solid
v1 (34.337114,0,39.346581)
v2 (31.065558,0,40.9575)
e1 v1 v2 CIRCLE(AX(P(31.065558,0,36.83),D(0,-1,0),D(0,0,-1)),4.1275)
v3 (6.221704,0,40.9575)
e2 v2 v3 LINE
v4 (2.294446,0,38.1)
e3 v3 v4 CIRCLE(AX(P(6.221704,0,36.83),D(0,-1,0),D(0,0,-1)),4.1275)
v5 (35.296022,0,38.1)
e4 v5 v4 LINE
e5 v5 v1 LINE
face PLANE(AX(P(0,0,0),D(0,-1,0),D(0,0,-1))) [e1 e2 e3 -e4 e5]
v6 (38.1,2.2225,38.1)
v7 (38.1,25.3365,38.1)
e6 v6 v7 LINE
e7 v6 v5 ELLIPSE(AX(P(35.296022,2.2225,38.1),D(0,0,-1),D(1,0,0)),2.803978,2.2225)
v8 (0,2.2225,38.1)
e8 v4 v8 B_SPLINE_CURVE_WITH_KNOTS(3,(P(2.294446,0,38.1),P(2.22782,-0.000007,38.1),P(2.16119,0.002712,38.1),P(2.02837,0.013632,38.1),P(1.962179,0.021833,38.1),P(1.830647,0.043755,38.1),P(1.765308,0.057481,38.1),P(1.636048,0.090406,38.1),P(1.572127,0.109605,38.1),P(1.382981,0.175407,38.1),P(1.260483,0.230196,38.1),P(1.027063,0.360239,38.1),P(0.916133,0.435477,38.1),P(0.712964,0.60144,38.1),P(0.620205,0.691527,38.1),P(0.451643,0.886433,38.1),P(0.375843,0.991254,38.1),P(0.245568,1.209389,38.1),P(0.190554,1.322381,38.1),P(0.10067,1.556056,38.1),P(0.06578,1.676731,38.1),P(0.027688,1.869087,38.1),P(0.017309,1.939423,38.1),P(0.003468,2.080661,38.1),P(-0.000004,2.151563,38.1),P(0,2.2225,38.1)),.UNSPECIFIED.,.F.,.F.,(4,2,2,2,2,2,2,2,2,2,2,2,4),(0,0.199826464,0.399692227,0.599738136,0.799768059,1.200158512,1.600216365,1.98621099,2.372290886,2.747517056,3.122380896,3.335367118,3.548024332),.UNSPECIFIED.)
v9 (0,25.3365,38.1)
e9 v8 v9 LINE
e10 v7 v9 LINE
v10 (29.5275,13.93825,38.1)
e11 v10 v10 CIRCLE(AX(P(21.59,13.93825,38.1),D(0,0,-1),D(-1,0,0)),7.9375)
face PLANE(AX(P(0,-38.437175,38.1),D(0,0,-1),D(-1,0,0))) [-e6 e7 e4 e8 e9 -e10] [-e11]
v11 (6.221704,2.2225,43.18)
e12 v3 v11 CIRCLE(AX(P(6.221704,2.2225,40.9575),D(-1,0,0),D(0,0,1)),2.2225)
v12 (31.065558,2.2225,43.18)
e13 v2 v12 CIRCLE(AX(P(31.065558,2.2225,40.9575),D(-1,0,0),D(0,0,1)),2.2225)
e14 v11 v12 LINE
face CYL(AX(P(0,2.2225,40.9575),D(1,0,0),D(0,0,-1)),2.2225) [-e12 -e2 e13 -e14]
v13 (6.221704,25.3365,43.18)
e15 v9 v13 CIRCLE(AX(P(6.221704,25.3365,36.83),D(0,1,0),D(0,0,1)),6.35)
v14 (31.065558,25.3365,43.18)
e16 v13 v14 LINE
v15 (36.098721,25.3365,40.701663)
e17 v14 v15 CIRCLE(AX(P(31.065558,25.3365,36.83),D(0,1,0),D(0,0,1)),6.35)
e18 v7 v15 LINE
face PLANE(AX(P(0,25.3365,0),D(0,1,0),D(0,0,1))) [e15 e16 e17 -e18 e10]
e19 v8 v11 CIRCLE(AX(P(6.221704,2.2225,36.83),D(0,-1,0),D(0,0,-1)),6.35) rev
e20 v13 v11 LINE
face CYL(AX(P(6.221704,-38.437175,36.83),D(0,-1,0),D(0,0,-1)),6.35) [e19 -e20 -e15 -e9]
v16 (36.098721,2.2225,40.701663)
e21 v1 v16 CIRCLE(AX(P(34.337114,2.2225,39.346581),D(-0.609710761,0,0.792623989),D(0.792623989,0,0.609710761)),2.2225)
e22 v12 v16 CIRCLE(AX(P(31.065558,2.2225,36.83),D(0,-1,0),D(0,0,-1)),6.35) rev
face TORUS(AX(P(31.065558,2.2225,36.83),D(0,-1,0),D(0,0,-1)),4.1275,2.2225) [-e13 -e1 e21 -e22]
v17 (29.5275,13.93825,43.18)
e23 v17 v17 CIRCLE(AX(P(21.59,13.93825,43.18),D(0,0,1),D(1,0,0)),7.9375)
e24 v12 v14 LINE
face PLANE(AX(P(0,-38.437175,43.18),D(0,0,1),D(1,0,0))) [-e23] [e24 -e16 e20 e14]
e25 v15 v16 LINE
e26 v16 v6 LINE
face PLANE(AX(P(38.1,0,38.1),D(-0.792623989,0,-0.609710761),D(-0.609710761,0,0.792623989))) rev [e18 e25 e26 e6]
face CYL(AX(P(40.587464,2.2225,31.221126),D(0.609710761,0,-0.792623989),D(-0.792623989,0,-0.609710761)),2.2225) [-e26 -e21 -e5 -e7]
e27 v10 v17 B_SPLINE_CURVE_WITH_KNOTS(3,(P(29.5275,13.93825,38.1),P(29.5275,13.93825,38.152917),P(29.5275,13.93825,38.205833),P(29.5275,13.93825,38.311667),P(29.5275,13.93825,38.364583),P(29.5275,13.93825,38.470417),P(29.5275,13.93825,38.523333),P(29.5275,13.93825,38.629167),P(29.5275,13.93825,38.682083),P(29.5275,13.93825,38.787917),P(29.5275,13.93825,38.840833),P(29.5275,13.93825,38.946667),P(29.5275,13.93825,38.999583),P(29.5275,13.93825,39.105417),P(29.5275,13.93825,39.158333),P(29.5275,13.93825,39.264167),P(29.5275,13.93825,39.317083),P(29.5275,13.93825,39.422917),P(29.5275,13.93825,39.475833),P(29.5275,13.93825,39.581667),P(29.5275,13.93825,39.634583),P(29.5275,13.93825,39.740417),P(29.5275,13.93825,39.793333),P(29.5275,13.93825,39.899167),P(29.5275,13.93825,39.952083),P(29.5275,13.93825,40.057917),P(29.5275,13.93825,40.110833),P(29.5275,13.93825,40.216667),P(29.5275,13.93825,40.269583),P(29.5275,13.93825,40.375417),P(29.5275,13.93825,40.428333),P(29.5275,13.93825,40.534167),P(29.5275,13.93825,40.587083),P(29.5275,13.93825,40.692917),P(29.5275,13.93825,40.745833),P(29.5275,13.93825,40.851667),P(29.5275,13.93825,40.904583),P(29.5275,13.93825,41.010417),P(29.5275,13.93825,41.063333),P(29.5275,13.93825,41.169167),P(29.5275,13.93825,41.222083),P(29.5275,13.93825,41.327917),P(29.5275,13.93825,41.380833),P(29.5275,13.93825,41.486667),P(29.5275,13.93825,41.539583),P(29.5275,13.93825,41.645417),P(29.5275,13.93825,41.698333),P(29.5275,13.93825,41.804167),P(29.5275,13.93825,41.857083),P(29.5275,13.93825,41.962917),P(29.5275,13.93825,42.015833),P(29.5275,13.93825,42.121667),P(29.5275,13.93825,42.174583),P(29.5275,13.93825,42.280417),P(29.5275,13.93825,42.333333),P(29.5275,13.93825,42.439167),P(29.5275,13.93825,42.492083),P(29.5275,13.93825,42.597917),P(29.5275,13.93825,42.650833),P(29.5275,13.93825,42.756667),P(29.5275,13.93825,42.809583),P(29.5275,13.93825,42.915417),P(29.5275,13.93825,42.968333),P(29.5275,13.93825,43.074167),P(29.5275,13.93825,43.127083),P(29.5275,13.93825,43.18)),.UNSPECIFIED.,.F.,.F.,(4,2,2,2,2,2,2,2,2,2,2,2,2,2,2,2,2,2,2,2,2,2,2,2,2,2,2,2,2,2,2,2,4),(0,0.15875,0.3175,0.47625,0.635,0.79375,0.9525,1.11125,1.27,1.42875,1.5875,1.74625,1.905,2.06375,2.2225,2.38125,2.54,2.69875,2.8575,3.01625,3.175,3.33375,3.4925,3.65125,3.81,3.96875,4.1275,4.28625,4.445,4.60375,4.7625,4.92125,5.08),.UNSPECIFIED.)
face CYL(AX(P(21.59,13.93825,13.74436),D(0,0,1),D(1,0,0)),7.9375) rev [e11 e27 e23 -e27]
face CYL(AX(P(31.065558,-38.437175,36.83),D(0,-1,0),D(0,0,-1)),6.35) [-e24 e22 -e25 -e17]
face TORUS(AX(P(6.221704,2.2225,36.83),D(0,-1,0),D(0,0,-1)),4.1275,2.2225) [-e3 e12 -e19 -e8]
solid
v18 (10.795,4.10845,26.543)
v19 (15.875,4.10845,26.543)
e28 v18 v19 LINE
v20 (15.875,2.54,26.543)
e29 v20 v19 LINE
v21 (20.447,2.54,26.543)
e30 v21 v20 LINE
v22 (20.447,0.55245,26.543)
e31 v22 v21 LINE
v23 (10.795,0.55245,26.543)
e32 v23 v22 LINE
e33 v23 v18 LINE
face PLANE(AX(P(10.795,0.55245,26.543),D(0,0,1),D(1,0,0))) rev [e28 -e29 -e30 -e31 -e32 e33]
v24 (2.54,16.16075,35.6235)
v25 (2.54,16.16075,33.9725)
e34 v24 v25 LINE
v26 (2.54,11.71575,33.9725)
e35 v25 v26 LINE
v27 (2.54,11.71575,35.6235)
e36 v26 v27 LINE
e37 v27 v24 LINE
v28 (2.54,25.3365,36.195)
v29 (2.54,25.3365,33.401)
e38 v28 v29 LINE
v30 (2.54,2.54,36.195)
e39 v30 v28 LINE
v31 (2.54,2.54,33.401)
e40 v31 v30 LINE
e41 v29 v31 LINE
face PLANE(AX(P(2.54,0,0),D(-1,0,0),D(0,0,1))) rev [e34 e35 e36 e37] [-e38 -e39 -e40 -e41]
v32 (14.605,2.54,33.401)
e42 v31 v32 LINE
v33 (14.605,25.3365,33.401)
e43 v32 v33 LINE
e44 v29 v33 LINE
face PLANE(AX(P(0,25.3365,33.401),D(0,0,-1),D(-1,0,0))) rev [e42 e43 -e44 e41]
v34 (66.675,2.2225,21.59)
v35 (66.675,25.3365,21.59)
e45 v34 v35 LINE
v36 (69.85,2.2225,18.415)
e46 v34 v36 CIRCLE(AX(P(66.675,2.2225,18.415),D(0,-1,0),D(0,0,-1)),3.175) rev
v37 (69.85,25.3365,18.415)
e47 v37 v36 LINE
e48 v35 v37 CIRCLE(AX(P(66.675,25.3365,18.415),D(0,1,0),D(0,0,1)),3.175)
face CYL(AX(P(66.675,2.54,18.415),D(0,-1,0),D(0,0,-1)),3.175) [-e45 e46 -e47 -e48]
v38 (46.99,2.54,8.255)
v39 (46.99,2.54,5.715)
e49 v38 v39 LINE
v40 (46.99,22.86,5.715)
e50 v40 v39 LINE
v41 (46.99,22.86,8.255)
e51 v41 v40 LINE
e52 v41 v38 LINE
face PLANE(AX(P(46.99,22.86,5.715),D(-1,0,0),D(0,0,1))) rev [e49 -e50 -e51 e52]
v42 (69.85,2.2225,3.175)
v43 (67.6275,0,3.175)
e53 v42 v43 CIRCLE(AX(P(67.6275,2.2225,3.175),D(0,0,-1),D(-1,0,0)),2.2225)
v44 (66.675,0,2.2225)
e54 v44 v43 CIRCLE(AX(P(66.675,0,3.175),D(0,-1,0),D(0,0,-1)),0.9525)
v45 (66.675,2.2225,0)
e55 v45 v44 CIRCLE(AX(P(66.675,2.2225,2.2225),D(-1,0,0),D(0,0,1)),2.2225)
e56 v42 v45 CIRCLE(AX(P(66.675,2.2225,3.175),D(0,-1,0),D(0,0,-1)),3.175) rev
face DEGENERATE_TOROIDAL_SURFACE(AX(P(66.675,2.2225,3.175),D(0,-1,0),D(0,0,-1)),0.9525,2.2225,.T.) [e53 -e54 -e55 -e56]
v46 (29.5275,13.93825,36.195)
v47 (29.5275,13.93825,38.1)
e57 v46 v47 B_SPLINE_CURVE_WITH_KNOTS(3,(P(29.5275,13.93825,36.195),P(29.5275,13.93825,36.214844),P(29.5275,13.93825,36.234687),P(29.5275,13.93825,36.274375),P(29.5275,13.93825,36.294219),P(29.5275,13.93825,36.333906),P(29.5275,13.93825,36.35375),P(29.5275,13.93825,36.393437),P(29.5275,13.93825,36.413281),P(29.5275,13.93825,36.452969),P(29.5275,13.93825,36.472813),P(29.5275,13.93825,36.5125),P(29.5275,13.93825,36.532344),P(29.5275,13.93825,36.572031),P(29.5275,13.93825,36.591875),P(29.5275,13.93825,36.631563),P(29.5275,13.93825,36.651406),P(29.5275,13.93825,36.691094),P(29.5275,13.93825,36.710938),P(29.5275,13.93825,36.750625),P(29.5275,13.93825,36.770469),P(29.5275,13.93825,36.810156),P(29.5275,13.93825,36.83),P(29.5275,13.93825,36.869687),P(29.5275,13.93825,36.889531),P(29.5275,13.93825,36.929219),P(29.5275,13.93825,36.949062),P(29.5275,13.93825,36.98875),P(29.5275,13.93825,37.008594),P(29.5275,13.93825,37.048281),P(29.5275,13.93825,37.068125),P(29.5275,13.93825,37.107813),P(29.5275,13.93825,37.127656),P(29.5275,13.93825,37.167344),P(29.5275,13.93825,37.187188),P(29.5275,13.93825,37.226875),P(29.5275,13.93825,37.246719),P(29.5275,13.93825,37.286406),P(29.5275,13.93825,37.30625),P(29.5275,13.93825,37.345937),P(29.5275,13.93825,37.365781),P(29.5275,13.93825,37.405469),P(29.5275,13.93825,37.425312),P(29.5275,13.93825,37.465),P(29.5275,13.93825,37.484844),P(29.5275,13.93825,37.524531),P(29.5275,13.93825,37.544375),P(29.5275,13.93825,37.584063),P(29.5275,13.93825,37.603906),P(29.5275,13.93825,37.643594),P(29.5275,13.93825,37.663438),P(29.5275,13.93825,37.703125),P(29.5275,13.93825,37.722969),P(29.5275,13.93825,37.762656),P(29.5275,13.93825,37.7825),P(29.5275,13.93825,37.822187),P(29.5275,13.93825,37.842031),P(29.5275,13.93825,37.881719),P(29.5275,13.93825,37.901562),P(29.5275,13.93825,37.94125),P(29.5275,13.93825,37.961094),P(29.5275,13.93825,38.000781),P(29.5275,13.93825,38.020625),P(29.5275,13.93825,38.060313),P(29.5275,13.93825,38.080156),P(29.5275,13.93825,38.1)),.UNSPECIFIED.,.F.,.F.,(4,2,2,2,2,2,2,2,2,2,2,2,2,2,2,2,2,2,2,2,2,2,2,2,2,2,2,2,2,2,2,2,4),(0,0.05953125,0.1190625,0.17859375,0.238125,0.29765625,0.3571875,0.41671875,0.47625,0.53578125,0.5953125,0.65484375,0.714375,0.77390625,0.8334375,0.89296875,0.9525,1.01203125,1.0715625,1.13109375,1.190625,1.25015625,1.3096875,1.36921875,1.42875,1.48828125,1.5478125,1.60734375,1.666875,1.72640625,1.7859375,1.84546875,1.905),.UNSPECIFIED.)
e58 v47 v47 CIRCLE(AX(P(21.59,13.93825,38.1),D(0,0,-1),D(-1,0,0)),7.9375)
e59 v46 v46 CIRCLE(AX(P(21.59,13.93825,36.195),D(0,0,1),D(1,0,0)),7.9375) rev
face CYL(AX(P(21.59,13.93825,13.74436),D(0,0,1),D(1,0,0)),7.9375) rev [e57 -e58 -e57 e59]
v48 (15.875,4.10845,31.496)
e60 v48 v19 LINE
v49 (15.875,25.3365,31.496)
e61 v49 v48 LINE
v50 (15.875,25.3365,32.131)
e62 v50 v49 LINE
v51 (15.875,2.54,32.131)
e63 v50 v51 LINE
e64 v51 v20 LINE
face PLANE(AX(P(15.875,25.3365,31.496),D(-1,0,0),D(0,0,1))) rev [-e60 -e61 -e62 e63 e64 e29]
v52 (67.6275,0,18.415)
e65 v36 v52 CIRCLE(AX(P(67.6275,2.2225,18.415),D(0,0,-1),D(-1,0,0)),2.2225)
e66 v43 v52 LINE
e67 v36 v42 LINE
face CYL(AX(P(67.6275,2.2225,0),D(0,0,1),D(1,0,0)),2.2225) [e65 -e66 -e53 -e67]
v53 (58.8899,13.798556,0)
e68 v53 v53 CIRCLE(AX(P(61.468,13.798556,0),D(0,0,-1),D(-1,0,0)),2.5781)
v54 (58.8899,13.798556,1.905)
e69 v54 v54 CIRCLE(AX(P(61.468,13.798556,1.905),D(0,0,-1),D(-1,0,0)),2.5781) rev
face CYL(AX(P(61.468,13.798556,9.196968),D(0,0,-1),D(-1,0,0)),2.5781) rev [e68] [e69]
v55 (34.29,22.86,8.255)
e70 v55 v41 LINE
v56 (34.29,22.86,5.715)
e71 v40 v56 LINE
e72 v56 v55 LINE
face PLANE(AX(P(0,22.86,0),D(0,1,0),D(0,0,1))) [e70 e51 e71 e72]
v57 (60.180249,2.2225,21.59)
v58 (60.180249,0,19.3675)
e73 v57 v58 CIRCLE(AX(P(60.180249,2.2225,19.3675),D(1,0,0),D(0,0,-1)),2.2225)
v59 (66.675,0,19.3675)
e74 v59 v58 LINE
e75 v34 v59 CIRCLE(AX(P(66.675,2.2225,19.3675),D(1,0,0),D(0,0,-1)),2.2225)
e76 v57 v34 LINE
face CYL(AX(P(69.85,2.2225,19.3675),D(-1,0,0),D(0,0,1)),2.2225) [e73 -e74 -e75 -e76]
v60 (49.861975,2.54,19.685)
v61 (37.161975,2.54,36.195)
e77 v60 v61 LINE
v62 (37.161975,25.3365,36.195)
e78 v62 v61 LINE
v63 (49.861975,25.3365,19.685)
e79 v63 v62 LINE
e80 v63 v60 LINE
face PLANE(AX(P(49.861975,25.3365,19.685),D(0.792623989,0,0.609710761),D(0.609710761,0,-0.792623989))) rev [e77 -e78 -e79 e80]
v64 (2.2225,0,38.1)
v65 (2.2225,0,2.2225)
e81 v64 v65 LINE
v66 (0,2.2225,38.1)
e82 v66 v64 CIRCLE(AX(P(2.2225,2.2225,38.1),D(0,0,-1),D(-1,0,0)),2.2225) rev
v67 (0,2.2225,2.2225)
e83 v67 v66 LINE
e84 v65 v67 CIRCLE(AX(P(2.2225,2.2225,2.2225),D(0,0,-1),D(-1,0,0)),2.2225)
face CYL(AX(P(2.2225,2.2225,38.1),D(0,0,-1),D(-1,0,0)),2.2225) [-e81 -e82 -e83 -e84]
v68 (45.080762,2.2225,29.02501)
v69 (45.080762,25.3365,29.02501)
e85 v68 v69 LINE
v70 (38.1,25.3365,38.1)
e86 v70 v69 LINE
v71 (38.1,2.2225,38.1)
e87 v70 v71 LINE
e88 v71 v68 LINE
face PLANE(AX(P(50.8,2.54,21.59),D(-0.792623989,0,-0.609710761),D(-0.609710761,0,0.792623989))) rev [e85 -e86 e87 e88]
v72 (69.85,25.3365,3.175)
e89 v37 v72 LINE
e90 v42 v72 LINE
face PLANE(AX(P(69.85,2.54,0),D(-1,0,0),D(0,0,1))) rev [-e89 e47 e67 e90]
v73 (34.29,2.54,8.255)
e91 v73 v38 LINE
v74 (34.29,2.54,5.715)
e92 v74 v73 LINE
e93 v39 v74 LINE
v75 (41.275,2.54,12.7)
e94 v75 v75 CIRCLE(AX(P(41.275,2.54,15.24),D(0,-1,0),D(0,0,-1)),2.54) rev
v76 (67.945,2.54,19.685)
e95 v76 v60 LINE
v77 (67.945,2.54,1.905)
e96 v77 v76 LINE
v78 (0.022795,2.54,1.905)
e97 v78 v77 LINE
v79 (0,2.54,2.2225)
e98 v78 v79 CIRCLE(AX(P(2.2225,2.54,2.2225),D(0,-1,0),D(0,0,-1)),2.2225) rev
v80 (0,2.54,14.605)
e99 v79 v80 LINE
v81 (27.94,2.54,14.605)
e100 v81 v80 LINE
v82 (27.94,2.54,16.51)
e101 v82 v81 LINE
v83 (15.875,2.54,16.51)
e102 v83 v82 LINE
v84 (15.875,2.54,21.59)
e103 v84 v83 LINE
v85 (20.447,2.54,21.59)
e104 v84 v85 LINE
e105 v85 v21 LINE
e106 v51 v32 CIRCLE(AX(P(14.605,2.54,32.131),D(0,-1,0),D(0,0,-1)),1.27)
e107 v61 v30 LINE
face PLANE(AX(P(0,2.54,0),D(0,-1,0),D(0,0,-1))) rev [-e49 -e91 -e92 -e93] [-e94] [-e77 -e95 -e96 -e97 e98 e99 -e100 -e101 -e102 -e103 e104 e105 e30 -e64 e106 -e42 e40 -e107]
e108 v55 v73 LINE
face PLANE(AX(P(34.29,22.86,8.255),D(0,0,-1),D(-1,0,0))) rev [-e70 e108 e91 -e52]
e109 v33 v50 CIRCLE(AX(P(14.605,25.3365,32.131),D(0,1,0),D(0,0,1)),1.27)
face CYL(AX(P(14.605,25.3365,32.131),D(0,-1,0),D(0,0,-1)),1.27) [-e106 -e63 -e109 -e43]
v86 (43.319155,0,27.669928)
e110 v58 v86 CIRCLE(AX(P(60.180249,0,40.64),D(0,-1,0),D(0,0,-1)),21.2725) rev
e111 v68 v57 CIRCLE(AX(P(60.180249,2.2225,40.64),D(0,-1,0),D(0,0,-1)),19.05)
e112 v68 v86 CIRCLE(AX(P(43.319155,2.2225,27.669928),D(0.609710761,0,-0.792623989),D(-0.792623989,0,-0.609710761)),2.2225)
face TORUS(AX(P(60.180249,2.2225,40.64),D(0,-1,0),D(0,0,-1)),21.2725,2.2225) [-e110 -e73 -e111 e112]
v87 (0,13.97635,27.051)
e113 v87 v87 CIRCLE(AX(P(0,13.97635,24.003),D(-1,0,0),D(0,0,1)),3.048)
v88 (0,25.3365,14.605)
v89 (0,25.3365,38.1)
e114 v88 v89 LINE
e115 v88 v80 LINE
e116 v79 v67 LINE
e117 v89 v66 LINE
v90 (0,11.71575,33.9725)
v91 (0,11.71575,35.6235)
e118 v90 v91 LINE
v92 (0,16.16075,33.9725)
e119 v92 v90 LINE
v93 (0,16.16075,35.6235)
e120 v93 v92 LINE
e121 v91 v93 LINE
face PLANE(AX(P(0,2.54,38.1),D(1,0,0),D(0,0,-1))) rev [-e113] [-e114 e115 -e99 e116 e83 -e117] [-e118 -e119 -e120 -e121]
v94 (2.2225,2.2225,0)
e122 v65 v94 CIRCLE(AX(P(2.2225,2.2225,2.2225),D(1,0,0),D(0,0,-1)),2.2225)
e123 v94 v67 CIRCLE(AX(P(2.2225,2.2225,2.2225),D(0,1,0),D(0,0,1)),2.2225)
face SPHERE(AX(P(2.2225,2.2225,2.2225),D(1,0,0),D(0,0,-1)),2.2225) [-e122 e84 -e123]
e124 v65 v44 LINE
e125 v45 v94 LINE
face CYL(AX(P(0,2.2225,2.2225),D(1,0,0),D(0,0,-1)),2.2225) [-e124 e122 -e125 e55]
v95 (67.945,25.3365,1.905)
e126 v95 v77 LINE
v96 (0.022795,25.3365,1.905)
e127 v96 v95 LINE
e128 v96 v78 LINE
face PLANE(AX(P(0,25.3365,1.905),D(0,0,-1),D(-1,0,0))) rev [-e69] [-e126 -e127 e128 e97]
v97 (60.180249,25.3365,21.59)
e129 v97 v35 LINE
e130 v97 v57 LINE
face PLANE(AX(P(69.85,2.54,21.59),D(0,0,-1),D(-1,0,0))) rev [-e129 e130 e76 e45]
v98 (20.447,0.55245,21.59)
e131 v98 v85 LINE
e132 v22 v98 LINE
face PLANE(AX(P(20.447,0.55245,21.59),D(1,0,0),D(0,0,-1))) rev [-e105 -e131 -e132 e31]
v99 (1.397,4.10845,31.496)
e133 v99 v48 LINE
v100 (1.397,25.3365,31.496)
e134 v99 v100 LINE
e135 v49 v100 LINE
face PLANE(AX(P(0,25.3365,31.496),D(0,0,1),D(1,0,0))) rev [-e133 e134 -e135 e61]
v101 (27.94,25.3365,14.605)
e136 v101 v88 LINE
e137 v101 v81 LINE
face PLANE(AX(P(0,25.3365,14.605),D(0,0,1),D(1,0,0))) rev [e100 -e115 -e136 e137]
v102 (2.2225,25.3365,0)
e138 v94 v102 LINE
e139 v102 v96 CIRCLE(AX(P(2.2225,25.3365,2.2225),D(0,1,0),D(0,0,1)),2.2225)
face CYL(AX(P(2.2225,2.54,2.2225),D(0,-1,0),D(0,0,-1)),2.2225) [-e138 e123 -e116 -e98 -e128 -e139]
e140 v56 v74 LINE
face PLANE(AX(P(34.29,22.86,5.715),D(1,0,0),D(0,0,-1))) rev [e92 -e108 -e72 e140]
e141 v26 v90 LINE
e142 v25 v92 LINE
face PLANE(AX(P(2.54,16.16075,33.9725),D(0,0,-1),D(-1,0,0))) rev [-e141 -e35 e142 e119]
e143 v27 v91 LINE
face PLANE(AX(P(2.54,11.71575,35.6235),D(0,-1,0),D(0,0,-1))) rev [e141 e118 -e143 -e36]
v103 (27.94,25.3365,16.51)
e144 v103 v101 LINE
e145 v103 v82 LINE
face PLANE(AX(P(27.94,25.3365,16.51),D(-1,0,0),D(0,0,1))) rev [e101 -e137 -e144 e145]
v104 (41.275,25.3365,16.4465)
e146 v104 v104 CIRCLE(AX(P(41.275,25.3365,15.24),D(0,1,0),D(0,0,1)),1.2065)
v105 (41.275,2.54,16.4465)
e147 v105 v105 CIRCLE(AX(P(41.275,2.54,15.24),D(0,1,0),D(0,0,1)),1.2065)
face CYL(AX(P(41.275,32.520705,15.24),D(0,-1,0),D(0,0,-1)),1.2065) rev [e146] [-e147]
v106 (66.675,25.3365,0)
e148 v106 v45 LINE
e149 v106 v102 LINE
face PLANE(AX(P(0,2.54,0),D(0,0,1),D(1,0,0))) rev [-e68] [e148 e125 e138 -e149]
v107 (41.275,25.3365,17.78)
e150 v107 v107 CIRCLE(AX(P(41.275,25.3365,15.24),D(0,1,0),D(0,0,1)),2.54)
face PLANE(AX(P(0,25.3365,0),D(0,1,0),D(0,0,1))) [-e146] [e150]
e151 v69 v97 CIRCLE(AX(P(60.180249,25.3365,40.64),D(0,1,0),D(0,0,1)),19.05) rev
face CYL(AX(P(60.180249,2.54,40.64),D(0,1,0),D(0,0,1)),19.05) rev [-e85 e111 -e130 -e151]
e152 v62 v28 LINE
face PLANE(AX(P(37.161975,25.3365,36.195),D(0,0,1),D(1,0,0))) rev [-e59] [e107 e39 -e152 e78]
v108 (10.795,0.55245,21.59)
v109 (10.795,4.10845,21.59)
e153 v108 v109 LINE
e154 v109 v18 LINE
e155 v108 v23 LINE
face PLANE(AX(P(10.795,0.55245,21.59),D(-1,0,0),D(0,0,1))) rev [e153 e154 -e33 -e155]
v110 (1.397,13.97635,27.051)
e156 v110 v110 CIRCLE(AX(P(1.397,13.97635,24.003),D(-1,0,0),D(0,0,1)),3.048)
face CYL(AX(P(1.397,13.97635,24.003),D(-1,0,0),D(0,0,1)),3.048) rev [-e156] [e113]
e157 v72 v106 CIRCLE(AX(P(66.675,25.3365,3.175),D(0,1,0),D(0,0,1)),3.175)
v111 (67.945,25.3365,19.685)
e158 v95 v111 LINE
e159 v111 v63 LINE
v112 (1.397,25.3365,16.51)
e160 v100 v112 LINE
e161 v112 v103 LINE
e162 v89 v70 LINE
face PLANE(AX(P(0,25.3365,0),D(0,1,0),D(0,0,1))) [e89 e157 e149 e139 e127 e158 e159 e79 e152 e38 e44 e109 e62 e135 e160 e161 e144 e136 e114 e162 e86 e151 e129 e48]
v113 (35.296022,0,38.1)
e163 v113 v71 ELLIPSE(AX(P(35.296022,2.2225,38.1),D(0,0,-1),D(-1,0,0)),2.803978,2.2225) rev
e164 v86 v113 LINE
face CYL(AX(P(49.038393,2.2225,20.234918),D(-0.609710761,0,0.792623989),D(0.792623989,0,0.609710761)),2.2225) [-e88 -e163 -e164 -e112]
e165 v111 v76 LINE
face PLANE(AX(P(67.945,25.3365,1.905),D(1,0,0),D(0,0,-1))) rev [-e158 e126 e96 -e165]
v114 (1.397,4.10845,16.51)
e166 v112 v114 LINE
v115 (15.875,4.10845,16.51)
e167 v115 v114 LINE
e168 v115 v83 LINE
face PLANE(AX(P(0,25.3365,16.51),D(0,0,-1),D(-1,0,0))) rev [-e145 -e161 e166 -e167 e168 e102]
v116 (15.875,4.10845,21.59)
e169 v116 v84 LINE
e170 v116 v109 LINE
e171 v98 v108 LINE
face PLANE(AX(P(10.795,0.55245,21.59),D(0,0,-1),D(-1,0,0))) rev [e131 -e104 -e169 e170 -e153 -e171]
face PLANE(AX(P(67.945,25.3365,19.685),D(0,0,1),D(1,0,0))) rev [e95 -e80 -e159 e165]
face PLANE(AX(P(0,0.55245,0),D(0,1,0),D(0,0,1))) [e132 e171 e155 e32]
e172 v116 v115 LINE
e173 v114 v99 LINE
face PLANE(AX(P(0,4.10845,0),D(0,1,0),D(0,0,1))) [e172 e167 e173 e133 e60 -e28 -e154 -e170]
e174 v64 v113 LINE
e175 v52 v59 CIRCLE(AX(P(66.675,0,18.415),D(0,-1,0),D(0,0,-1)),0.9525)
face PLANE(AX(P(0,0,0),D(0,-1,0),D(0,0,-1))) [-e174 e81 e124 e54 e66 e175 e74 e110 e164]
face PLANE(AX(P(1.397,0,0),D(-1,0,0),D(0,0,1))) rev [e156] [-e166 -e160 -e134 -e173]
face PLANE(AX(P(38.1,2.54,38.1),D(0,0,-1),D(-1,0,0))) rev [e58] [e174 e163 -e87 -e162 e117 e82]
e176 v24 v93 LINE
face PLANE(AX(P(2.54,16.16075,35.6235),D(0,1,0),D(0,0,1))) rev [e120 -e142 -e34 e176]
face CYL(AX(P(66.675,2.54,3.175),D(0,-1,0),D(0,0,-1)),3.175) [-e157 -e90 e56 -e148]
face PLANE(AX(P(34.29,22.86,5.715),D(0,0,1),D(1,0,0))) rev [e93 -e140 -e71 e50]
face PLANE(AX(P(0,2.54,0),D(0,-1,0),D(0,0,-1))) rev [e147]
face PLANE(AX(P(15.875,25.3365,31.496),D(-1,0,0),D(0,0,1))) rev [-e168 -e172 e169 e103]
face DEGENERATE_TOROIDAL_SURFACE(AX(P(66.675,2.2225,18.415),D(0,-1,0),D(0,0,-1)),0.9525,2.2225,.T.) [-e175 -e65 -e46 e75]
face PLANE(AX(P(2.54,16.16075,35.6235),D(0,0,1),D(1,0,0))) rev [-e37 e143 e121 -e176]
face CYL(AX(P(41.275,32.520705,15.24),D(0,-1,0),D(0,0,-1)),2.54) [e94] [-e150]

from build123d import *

# Parameters (mm, degrees)
BOSS_EXTRUDE1_DEPTH = 2.54
BOSS_EXTRUDE2_DEPTH = 22.7965
SKETCH3_W           = 27.94
SKETCH3_H           = 1.905
SKETCH3_W_2         = 15.875
BOSS_EXTRUDE3_DEPTH = 22.7965
SKETCH4_W           = 2.794
SKETCH4_H           = 22.7965
SKETCH4_W_2         = 1.651
SKETCH4_H_2         = 4.445
BOSS_EXTRUDE4_DEPTH = 2.54
FILLET5_R           = 1.27
SKETCH6_W           = 38.1
SKETCH6_H           = 5.08
BOSS_EXTRUDE5_DEPTH = 25.3365
CUT_EXTRUDE1_START  = -6.985
SKETCH7_R           = 7.9375
CUT_EXTRUDE1_DEPTH  = 6.985
CUT_EXTRUDE2_DEPTH  = 86.938775487
SKETCH10_R          = 2.54
SKETCH10_R_2        = 1.2065
BOSS_EXTRUDE6_DEPTH = 22.7965
FILLET6_R           = 19.05
FILLET7_R           = 6.35
FILLET8_R           = 3.175
FILLET9_R           = 2.2225
FILLET10_R          = 2.2225
FILLET11_R          = 2.2225
SKETCH11_W          = 15.875
SKETCH11_H          = 14.986
BOSS_EXTRUDE7_DEPTH = 1.56845
SKETCH12_W          = 14.986
SKETCH12_H          = 21.22805
SKETCH12_R          = 3.048
BOSS_EXTRUDE8_DEPTH = 1.397
SKETCH14_R          = 2.5781
CUT_EXTRUDE3_DEPTH  = 1.905
SKETCH15_W          = 12.7
SKETCH15_H          = 2.54
BOSS_EXTRUDE9_DEPTH = 20.32
SKETCH16_W          = 9.652
SKETCH16_H          = 4.953
CUT_EXTRUDE4_DEPTH  = 3.556


with BuildPart() as part:
    # Sketch1 → Boss-Extrude1 (new body)
    with BuildSketch(Plane(origin=(0, 0, 0), x_dir=(1, 0, 0), z_dir=(0, 1, 0))):
        Polygon((0, 0), (69.85, 0), (69.85, -21.59), (50.8, -21.59), (38.1, -38.1), (0, -38.1), align=None)
    extrude(amount=BOSS_EXTRUDE1_DEPTH)

    # Sketch2 → Boss-Extrude2 (add)
    with BuildSketch(Plane(origin=(0, 2.54, 0), x_dir=(1, 0, 0), z_dir=(0, 1, 0))):
        Polygon((0, 0), (0, -1.905), (67.945, -1.905), (67.945, -19.685), (49.861975147, -19.685), (37.161975147, -36.195), (0, -36.195), (0, -38.1), (38.1, -38.1), (50.8, -21.59), (69.85, -21.59), (69.85, 0), align=None)
    extrude(amount=BOSS_EXTRUDE2_DEPTH)

    # Sketch3 → Boss-Extrude3 (add)
    with BuildSketch(Plane(origin=(0, 2.54, 0), x_dir=(1, 0, 0), z_dir=(0, 1, 0))):
        with Locations((13.97, -15.5575)):
            Rectangle(SKETCH3_W, SKETCH3_H)
        with Locations((7.9375, -32.4485)):
            Rectangle(SKETCH3_W_2, SKETCH3_H)
    extrude(amount=BOSS_EXTRUDE3_DEPTH)

    # Sketch4 → Boss-Extrude4 (add)
    with BuildSketch(Plane.ZY):
        with Locations((34.798, 13.93825)):
            Rectangle(SKETCH4_W, SKETCH4_H)
        with Locations((34.798, 13.93825)):
            Rectangle(SKETCH4_W_2, SKETCH4_H_2, mode=Mode.SUBTRACT)
    extrude(amount=-BOSS_EXTRUDE4_DEPTH)

    # Fillet5
    fillet5_edges = [part.edges().sort_by_distance(p)[0] for p in [
        (15.875, 13.93825, 33.401),
    ]]
    fillet(fillet5_edges, radius=FILLET5_R)


with BuildPart() as body_2:
    # Sketch6 → Boss-Extrude5 (new body)
    with BuildSketch(Plane(origin=(0, 25.3365, 0), x_dir=(1, 0, 0), z_dir=(0, 1, 0))):
        with Locations((19.05, -40.64)):
            Rectangle(SKETCH6_W, SKETCH6_H)
    extrude(amount=-BOSS_EXTRUDE5_DEPTH)


with BuildPart() as cut_extrude1_tool:
    # Sketch7 → Cut-Extrude1 (new body)
    with BuildSketch(Plane.XY.offset(43.18).offset(CUT_EXTRUDE1_START)):
        with Locations((21.59, 13.93825)):
            Circle(SKETCH7_R)
    extrude(amount=CUT_EXTRUDE1_DEPTH)


with BuildPart() as part_1:
    add(part.part)

    # Cut-Extrude1: cut by cut_extrude1_tool
    add(cut_extrude1_tool.part, mode=Mode.SUBTRACT)

    # Sketch10 → Boss-Extrude6 (add)
    with BuildSketch(Plane(origin=(0, 2.54, 0), x_dir=(1, 0, 0), z_dir=(0, 1, 0))):
        with Locations(Location((41.275, -15.24, 0), (0, 0, 90))):
            Circle(SKETCH10_R)
        with Locations(Location((41.275, -15.24, 0), (0, 0, 270))):
            Circle(SKETCH10_R_2, mode=Mode.SUBTRACT)
    extrude(amount=BOSS_EXTRUDE6_DEPTH)

    # Fillet6
    fillet6_edges = [part_1.edges().sort_by_distance(p)[0] for p in [
        (50.8, 12.66825, 21.59),
    ]]
    fillet(fillet6_edges, radius=FILLET6_R)

    # Fillet8
    fillet8_edges = [part_1.edges().sort_by_distance(p)[0] for p in [
        (69.85, 12.66825, 0),
        (69.85, 12.66825, 21.59),
    ]]
    fillet(fillet8_edges, radius=FILLET8_R)

    # Fillet9
    fillet9_edges = [part_1.edges().sort_by_distance(p)[0] for p in [
        (63.427624263, 0, 21.59),
        (51.764877453, 0, 23.549533953),
        (69.85, 0, 10.795),
        (33.3375, 0, 0),
        (68.92006403, 0, 0.92993597),
        (68.92006403, 0, 20.66006403),
        (41.590380767, 0, 33.562505003),
    ]]
    fillet(fillet9_edges, radius=FILLET9_R)

    # Fillet11
    fillet11_edges = [part_1.edges().sort_by_distance(p)[0] for p in [
        (0, 13.7795, 0),
        (0, 0.650955179, 0.650955179),
        (0, 0, 20.16125),
    ]]
    fillet(fillet11_edges, radius=FILLET11_R)

    # Sketch11 → Boss-Extrude7 (add)
    with BuildSketch(Plane(origin=(0, 2.54, 0), x_dir=(1, 0, 0), z_dir=(0, 1, 0))):
        with Locations((7.9375, -24.003)):
            Rectangle(SKETCH11_W, SKETCH11_H)
    extrude(amount=BOSS_EXTRUDE7_DEPTH)

    # Sketch12 → Boss-Extrude8 (add)
    with BuildSketch(Plane.ZY):
        with Locations((24.003, 14.722475)):
            Rectangle(SKETCH12_W, SKETCH12_H)
        with Locations((24.003, 13.97635)):
            Circle(SKETCH12_R, mode=Mode.SUBTRACT)
    extrude(amount=-BOSS_EXTRUDE8_DEPTH)

    # Sketch14 → Cut-Extrude3 (cut)
    with BuildSketch(Plane(origin=(0, 0, 0), x_dir=(-1, 0, 0), z_dir=(0, 0, -1))):
        with Locations((-61.468, 13.798556219)):
            Circle(SKETCH14_R)
    extrude(amount=-CUT_EXTRUDE3_DEPTH, mode=Mode.SUBTRACT)

    # Sketch15 → Boss-Extrude9 (add)
    with BuildSketch(Plane(origin=(0, 2.54, 0), x_dir=(1, 0, 0), z_dir=(0, 1, 0))):
        with Locations((40.64, -6.985)):
            Rectangle(SKETCH15_W, SKETCH15_H)
    extrude(amount=BOSS_EXTRUDE9_DEPTH)

    # Sketch16 → Cut-Extrude4 (cut)
    with BuildSketch(Plane(origin=(0, 4.10845, 0), x_dir=(1, 0, 0), z_dir=(0, 1, 0))):
        with Locations((15.621, -24.0665)):
            Rectangle(SKETCH16_W, SKETCH16_H)
    extrude(amount=-CUT_EXTRUDE4_DEPTH, mode=Mode.SUBTRACT)


with BuildPart() as body_2_1:
    add(body_2.part)

    # Cut-Extrude1: cut by cut_extrude1_tool
    add(cut_extrude1_tool.part, mode=Mode.SUBTRACT)

    # Sketch9 → Cut-Extrude2 (cut, through all)
    with BuildSketch(Plane(origin=(0, 25.3365, 0), x_dir=(1, 0, 0), z_dir=(0, 1, 0))):
        Polygon((38.1, -38.1), (34.192307692, -43.18), (38.1, -43.18), align=None)
    extrude(amount=-CUT_EXTRUDE2_DEPTH, mode=Mode.SUBTRACT)

    # Fillet7
    # the kernel refuses this fillet: 6.35 mm, written as the material it takes off along each edge
    with BuildSketch(Plane(origin=(0, 40.890759867, 43.18), x_dir=(1.5737716562133841e-12, 0, -1.0), z_dir=(0, -1, 0))) as fillet7_piece_1:
        with BuildLine():
            CenterArc((6.35, 6.221703947), FILLET7_R, 180, 78.463040967)
            Line((0, 6.221703947), (-0.127, 6.221703947))
            Line((-0.127, 6.221703947), (-0.127, 0))
            Line((-0.127, 0), (0, -0.127))
            ThreePointArc((0, -0.127), (2.54, -0.127), (5.0546, -0.124434079))
            Line((5.0546, -0.124434079), (5.08, 0))
        make_face()
    extrude(amount=56.445019733, mode=Mode.SUBTRACT)
    with BuildSketch(Plane(origin=(34.192307692, 33.153373772, 43.18), x_dir=(0.6097107608496929, 0, -0.7926239891045996), z_dir=(0, -1, 0))) as fillet7_piece_2:
        with BuildLine():
            CenterArc((FILLET7_R * 0.492401497451, -FILLET7_R), FILLET7_R, 90, 52.431407971)
            Line((-FILLET7_R * 0.300222491654, -FILLET7_R * 0.39028923915), (-FILLET7_R * 0.316074971436, -FILLET7_R * 0.378095023933))
            Line((-FILLET7_R * 0.316074971436, -FILLET7_R * 0.378095023933), (-FILLET7_R * 0.00984802994901, FILLET7_R * 0.02))
            Line((-FILLET7_R * 0.00984802994901, FILLET7_R * 0.02), (FILLET7_R * 0.492401497451, FILLET7_R * 0.02))
            Line((FILLET7_R * 0.492401497451, FILLET7_R * 0.02), (FILLET7_R * 0.492401497451, 0))
        make_face()
    extrude(amount=40.970247544, mode=Mode.SUBTRACT)

    # Fillet10
    fillet10_edges = [body_2_1.edges().sort_by_distance(p)[0] for p in [
        (37.099360257, 0, 39.400831666),
        (18.643631065, 0, 43.18),
        (33.870681875, 0, 42.526822016),
        (2.205611318, 0, 41.74868885),
    ]]
    fillet(fillet10_edges, radius=FILLET10_R)


solid = Compound([part_1.part, body_2_1.part])
